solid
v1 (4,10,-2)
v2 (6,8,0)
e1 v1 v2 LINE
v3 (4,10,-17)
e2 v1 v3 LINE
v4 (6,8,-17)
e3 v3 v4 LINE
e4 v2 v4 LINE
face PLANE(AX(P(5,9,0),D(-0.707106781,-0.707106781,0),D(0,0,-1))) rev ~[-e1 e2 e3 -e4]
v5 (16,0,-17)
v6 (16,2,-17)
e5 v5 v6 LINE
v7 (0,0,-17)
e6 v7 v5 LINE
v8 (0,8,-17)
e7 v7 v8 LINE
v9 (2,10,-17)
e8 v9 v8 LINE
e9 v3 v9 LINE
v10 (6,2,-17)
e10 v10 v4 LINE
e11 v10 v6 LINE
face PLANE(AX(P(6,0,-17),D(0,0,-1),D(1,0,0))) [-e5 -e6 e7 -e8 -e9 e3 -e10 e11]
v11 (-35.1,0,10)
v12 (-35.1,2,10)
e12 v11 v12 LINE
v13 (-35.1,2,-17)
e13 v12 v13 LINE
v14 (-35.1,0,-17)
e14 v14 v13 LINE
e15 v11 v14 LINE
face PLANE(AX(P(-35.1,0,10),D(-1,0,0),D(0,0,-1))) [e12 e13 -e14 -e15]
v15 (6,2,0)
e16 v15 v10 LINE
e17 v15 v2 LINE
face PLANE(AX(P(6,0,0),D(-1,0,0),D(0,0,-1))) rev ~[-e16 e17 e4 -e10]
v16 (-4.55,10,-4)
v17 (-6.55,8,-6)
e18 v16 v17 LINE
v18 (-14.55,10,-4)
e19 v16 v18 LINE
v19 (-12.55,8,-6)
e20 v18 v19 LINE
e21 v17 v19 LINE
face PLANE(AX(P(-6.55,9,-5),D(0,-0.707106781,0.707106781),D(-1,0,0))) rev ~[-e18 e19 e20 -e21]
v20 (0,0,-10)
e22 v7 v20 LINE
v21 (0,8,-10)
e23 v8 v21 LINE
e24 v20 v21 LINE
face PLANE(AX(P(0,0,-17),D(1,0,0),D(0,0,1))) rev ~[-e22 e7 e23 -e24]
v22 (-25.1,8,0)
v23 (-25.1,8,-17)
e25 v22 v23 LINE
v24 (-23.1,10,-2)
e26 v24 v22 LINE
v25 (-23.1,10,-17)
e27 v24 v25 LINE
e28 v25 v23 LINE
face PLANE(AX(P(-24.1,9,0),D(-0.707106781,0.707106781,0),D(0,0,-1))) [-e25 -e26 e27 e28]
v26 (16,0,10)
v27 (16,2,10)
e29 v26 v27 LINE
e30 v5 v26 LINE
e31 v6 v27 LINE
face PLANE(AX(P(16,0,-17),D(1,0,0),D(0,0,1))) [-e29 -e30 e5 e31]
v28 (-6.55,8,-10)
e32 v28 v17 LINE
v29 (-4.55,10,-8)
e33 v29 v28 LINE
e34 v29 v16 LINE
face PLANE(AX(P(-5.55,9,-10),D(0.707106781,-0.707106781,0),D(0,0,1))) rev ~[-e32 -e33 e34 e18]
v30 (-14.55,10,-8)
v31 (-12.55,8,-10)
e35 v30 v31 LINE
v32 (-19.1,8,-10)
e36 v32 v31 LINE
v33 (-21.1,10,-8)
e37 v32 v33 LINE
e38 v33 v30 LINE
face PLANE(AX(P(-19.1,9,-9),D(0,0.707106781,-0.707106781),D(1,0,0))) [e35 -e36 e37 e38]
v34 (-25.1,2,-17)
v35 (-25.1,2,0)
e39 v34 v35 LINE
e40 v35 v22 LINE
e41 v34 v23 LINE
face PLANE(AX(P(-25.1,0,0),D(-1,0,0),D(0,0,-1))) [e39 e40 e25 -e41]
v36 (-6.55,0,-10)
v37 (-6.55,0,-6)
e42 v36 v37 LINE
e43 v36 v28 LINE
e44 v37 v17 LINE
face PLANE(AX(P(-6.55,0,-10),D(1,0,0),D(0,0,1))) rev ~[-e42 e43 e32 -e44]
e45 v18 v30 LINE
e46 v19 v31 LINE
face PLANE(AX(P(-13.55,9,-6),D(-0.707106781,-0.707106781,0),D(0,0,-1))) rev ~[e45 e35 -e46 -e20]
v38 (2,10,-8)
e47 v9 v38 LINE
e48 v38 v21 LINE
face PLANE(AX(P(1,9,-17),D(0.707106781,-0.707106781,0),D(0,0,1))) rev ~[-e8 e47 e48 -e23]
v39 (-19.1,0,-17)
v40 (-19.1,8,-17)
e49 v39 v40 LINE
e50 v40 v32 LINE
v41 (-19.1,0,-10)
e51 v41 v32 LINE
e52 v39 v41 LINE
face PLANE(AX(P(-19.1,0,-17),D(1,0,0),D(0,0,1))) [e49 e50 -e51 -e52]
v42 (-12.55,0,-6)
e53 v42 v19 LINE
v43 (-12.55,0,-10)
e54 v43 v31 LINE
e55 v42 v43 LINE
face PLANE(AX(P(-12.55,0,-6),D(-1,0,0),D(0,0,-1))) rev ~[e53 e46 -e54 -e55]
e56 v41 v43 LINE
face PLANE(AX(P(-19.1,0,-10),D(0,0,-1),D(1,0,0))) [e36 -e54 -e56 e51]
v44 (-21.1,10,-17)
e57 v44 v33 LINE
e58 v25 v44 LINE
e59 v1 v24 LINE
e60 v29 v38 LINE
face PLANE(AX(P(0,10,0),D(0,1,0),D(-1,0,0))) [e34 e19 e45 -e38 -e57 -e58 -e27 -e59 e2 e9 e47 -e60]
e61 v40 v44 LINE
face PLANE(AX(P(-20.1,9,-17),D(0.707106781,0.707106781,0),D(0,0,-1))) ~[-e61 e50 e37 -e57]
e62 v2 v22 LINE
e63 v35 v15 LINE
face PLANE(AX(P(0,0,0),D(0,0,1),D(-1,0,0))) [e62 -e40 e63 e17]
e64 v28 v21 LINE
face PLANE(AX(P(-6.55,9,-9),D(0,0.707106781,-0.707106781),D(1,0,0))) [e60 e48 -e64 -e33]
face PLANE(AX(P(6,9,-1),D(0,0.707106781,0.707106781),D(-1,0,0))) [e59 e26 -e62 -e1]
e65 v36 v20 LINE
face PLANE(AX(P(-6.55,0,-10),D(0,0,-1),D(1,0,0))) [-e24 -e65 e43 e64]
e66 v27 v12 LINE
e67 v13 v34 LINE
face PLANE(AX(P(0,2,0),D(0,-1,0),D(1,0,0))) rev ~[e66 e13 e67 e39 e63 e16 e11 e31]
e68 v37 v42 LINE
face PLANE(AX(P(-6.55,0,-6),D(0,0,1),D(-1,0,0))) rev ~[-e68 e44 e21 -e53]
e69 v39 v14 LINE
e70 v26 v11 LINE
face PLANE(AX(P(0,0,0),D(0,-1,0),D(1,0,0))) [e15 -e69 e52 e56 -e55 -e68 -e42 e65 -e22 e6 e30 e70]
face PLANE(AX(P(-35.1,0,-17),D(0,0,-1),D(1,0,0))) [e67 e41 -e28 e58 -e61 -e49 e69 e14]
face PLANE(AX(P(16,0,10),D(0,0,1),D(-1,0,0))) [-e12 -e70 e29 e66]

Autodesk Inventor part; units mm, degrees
ref_plane "YZ Plane" through (0, 0, 0) normal (1, 0, 0) x (0, 1, 0)
ref_plane "XZ Plane" through (0, 0, 0) normal (0, 1, 0) x (-1, 0, 0)
ref_plane "XY Plane" through (0, 0, 0) normal (0, 0, 1) x (1, 0, 0)
sketch "Sketch1" plane through (0, 0, 0) normal (0, 1, 0) x (-1, 0, 0)
  line L0 (0, 0) -> (19.1, 0)
  line L1 (19.1, 0) -> (19.1, -10)
  line L2 (19.1, -10) -> (0, -10)
  line L3 (0, -10) -> (0, 0)
  line L4 (12.55, -10) -> (6.55, -10)
  line L5 (6.55, -10) -> (6.55, -6)
  line L6 (6.55, -6) -> (12.55, -6)
  line L7 (12.55, -6) -> (12.55, -10)
  line L8 (0, 0) -> (-6, 0)
  line L9 (-6, 0) -> (-6, -17)
  line L10 (-6, -17) -> (0, -17)
  line L11 (0, -17) -> (0, 0)
  line L12 (19.1, 0) -> (25.1, 0)
  line L13 (25.1, 0) -> (25.1, -17)
  line L14 (25.1, -17) -> (19.1, -17)
  line L15 (19.1, -17) -> (19.1, 0)
  point P0 (9.55, -6)
  point P1 (9.55, 0)
  point P2 (6.55, -10)
  point P3 (0, -10)
  dimension "d0" = 6
  dimension "d1" = 19.1
  dimension "d2" = 4
  dimension "d3" = 10
  dimension "d6" = 6
  dimension "d7" = 6
  dimension "d8" = 17
  dimension "d20" = 7
extrude "Extrusion1" add sketch "Sketch1" along normal blind 10 contours L0 L1 L2 L7 L6 L5 L3 | L3 L11 L10 L9 L8 | L12 L13 L14 L15 L1
sketch "Sketch2" plane through (0, 0, 0) normal (0, -1, 0) x (1, 0, 0)
  line L0 (-25.1, 0) -> (6, 0) projected
  line L1 (-25.1, -17) -> (-25.1, 0) projected
  line L2 (-19.1, -17) -> (-25.1, -17) projected
  line L3 (-19.1, -10) -> (-19.1, -17) projected
  line L4 (-12.55, -10) -> (-19.1, -10) projected
  line L5 (-12.55, -6) -> (-12.55, -10) projected
  line L6 (-6.55, -6) -> (-12.55, -6) projected
  line L7 (-6.55, -10) -> (-6.55, -6) projected
  line L8 (0, -10) -> (-6.55, -10) projected
  line L9 (0, -17) -> (0, -10) projected
  line L10 (6, -17) -> (0, -17) projected
  line L11 (6, 0) -> (6, -17) projected
  line L12 (6, -17) -> (16, -17)
  line L13 (16, -17) -> (16, 10)
  line L14 (16, 10) -> (-35.1, 10)
  line L15 (-35.1, 10) -> (-35.1, -17)
  line L16 (-35.1, -17) -> (-25.1, -17)
  point P0 (0, 0)
  dimension "d9" = 10
  dimension "d10" = 10
  dimension "d11" = 10
extrude "Extrusion2" add sketch "Sketch2" against normal blind 2 contours L1 L16 L15 L14 L13 L12 L11 L0
chamfer "Chamfer1" distance 2 angle 45 7 edges at (-19.1, 10, -13.5) (-15.825, 10, -10) (-9.55, 10, -6) (-6.55, 10, -8) (0, 10, -13.5) (-3.275, 10, -10) (-12.55, 10, -8)
chamfer "Chamfer2" distance 2 angle 45 3 edges at (6, 10, -8.5) (-9.55, 10, 0) (-25.1, 10, -8.5)
properties part number "millmax_solder_rig"
